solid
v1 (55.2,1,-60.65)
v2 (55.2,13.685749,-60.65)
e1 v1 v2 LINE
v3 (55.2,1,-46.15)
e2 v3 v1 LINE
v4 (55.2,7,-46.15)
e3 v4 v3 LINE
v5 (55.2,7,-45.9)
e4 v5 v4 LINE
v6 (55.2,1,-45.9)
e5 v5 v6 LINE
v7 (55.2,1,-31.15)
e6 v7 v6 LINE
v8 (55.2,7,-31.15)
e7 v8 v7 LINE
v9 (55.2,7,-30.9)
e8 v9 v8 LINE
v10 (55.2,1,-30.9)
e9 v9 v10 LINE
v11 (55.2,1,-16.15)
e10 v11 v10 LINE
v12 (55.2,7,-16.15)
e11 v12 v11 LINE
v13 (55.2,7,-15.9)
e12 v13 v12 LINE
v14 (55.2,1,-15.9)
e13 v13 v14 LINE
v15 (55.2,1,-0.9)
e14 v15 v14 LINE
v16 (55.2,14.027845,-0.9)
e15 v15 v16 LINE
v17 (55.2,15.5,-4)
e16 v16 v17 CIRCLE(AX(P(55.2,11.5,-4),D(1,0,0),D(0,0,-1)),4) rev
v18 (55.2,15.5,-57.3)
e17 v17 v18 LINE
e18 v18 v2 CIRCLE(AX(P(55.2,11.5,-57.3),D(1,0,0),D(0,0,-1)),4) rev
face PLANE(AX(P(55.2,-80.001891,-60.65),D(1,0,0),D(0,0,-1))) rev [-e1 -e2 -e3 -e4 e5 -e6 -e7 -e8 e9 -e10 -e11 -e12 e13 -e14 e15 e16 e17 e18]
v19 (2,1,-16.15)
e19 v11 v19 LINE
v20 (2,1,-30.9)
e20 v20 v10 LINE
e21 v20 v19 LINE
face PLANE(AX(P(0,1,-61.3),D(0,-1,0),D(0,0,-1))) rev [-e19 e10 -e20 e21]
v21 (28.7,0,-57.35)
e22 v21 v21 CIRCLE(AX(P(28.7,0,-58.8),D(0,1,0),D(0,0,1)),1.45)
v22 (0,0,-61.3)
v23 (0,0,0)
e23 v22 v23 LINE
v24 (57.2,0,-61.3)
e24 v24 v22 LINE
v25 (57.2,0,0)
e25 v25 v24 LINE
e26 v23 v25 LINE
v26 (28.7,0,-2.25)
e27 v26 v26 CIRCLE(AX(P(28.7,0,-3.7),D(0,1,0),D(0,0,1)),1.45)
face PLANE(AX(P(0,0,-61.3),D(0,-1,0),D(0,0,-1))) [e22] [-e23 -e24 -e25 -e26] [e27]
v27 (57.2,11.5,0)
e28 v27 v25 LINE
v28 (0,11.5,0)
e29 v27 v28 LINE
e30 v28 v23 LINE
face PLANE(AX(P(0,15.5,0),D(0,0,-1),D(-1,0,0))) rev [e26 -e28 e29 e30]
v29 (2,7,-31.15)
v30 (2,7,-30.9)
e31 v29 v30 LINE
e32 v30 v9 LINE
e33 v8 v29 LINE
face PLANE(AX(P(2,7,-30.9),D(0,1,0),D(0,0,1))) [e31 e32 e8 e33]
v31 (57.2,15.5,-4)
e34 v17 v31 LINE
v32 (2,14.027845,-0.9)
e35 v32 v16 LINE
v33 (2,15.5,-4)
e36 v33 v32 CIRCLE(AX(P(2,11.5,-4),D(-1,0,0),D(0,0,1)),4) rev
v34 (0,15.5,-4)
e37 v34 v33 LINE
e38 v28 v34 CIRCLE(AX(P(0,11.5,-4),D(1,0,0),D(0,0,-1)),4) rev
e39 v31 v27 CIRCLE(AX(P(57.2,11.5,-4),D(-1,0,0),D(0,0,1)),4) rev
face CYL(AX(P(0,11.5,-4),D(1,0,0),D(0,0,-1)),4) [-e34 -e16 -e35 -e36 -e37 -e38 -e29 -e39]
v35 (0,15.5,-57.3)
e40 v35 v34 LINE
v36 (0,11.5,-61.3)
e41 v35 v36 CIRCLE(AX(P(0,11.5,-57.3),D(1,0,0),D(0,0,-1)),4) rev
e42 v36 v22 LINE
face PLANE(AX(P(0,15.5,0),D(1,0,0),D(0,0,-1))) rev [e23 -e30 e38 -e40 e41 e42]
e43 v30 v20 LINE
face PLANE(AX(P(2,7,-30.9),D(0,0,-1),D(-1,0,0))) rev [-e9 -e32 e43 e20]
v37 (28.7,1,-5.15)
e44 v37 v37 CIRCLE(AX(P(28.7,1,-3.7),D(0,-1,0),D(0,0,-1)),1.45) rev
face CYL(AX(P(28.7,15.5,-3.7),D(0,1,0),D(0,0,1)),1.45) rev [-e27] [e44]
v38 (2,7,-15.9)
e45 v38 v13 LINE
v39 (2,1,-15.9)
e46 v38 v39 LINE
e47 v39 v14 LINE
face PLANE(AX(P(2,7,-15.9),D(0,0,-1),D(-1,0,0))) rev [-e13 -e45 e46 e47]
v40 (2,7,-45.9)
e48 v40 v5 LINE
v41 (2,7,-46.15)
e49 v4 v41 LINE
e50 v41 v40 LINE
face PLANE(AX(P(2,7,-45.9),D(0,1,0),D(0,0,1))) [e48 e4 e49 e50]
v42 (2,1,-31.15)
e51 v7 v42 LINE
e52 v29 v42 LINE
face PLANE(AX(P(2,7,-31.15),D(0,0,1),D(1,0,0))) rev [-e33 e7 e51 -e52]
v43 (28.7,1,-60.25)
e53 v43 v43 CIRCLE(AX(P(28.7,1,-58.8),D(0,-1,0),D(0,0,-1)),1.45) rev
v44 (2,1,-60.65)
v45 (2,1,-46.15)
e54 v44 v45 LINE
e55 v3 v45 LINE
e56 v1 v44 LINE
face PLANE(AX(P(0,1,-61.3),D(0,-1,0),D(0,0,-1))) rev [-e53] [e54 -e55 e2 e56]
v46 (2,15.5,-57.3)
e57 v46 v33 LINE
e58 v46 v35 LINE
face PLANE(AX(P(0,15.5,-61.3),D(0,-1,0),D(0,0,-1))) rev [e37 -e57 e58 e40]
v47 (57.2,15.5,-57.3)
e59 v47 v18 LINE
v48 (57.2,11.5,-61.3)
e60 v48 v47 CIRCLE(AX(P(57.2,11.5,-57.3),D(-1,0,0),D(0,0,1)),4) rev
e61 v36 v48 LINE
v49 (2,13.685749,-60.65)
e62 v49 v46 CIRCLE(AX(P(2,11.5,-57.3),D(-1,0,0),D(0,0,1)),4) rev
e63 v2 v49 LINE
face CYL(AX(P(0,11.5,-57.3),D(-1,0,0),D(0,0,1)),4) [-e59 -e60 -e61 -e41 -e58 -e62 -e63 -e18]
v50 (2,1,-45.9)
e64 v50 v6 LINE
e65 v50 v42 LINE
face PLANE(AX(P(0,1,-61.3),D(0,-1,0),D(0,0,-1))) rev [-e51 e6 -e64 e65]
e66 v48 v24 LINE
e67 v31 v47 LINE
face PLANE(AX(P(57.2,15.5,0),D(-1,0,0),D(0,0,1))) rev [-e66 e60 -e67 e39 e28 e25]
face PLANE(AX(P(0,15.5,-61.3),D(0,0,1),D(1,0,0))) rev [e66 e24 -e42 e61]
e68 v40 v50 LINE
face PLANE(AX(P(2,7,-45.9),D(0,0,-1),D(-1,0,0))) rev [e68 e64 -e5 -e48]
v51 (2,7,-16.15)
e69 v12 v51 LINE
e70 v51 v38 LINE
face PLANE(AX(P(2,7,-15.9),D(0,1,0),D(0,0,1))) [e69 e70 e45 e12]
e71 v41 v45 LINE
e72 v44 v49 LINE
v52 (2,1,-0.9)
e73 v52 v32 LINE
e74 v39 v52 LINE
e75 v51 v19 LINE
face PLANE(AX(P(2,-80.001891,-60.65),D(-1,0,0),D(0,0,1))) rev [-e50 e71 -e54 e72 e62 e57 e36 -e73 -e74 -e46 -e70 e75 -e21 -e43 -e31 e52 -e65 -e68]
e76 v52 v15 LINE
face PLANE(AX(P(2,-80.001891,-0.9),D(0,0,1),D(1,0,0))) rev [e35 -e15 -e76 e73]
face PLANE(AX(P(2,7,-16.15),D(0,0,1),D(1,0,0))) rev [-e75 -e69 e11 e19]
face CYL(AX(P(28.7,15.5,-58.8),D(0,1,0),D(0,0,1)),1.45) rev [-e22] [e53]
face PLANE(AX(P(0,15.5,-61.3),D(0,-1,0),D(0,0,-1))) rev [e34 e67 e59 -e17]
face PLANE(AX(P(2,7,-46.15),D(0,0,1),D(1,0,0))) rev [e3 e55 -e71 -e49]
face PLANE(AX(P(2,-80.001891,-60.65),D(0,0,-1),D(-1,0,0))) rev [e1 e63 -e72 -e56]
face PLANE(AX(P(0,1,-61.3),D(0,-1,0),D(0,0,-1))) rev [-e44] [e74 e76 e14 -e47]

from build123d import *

# Parameters (mm, degrees)
SKETCH1_W                  = 57.2
SKETCH1_H                  = 61.3
BOSS_EXTRUDE1_DEPTH        = 15.5
F_2_9_2_9_DIAMETER_HOLE1_D = 2.9
SKETCH4_W                  = 53.2
SKETCH4_H                  = 59.75
CUT_EXTRUDE1_DEPTH         = 14.5
FILLET4_R                  = 4
SKETCH5_W                  = 53.2
SKETCH5_H                  = 0.25
BOSS_EXTRUDE2_DEPTH        = 6
LPATTERN1_COUNT            = 3
LPATTERN1_PITCH            = 15


with BuildPart() as part:
    # Sketch1 → Boss-Extrude1 (new body)
    with BuildSketch(Plane(origin=(0, 0, 0), x_dir=(1, 0, 0), z_dir=(0, 1, 0))):
        with Locations((28.6, 30.65)):
            Rectangle(SKETCH1_W, SKETCH1_H)
    extrude(amount=BOSS_EXTRUDE1_DEPTH)

    # Ø2.9 (2.9) Diameter Hole1 (through all)
    with Locations(Plane(origin=(0, 15.5, 0), x_dir=(-1, 0, 0), z_dir=(0, 1, 0))):
        with Locations((-28.7, -58.8), (-28.7, -3.7)):
            Hole(F_2_9_2_9_DIAMETER_HOLE1_D / 2)

    # Sketch4 → Cut-Extrude1 (cut)
    with BuildSketch(Plane(origin=(0, 15.5, 0), x_dir=(1, 0, 0), z_dir=(0, 1, 0))):
        with Locations((28.6, 30.775)):
            Rectangle(SKETCH4_W, SKETCH4_H)
    extrude(amount=-CUT_EXTRUDE1_DEPTH, mode=Mode.SUBTRACT)

    # Fillet4
    # the kernel refuses this fillet: 4 mm, written as the material it takes off along each edge
    with BuildSketch(Plane(origin=(-10, 15.5, 0), x_dir=(0, -1, 0), z_dir=(1, 0, 0))) as fillet4_piece_1:
        with BuildLine():
            CenterArc((FILLET4_R, FILLET4_R), FILLET4_R, 180, 90)
            Line((0, FILLET4_R), (0, 0))
            Line((0, 0), (FILLET4_R, 0))
        make_face()
    extrude(amount=77.2, mode=Mode.SUBTRACT)
    with BuildSketch(Plane(origin=(67.2, 15.5, -61.3), x_dir=(0, 0, 1), z_dir=(-1, 0, 0))) as fillet4_piece_2:
        with BuildLine():
            CenterArc((FILLET4_R, -FILLET4_R), FILLET4_R, 90, 90)
            Line((0, -FILLET4_R), (0, 0))
            Line((0, 0), (FILLET4_R, 0))
        make_face()
    extrude(amount=77.2, mode=Mode.SUBTRACT)

    # Sketch5 → Boss-Extrude2 (add)
    with BuildSketch(Plane(origin=(0, 1, 0), x_dir=(1, 0, 0), z_dir=(0, 1, 0))):
        with Locations((28.6, 16.025)):
            Rectangle(SKETCH5_W, SKETCH5_H)
    boss_extrude2 = extrude(amount=BOSS_EXTRUDE2_DEPTH)

    # LPattern1: Boss-Extrude2 ×3
    with Locations(*[(0, 0, -i * LPATTERN1_PITCH) for i in range(1, LPATTERN1_COUNT)]):
        add(boss_extrude2)


solid = part.part
